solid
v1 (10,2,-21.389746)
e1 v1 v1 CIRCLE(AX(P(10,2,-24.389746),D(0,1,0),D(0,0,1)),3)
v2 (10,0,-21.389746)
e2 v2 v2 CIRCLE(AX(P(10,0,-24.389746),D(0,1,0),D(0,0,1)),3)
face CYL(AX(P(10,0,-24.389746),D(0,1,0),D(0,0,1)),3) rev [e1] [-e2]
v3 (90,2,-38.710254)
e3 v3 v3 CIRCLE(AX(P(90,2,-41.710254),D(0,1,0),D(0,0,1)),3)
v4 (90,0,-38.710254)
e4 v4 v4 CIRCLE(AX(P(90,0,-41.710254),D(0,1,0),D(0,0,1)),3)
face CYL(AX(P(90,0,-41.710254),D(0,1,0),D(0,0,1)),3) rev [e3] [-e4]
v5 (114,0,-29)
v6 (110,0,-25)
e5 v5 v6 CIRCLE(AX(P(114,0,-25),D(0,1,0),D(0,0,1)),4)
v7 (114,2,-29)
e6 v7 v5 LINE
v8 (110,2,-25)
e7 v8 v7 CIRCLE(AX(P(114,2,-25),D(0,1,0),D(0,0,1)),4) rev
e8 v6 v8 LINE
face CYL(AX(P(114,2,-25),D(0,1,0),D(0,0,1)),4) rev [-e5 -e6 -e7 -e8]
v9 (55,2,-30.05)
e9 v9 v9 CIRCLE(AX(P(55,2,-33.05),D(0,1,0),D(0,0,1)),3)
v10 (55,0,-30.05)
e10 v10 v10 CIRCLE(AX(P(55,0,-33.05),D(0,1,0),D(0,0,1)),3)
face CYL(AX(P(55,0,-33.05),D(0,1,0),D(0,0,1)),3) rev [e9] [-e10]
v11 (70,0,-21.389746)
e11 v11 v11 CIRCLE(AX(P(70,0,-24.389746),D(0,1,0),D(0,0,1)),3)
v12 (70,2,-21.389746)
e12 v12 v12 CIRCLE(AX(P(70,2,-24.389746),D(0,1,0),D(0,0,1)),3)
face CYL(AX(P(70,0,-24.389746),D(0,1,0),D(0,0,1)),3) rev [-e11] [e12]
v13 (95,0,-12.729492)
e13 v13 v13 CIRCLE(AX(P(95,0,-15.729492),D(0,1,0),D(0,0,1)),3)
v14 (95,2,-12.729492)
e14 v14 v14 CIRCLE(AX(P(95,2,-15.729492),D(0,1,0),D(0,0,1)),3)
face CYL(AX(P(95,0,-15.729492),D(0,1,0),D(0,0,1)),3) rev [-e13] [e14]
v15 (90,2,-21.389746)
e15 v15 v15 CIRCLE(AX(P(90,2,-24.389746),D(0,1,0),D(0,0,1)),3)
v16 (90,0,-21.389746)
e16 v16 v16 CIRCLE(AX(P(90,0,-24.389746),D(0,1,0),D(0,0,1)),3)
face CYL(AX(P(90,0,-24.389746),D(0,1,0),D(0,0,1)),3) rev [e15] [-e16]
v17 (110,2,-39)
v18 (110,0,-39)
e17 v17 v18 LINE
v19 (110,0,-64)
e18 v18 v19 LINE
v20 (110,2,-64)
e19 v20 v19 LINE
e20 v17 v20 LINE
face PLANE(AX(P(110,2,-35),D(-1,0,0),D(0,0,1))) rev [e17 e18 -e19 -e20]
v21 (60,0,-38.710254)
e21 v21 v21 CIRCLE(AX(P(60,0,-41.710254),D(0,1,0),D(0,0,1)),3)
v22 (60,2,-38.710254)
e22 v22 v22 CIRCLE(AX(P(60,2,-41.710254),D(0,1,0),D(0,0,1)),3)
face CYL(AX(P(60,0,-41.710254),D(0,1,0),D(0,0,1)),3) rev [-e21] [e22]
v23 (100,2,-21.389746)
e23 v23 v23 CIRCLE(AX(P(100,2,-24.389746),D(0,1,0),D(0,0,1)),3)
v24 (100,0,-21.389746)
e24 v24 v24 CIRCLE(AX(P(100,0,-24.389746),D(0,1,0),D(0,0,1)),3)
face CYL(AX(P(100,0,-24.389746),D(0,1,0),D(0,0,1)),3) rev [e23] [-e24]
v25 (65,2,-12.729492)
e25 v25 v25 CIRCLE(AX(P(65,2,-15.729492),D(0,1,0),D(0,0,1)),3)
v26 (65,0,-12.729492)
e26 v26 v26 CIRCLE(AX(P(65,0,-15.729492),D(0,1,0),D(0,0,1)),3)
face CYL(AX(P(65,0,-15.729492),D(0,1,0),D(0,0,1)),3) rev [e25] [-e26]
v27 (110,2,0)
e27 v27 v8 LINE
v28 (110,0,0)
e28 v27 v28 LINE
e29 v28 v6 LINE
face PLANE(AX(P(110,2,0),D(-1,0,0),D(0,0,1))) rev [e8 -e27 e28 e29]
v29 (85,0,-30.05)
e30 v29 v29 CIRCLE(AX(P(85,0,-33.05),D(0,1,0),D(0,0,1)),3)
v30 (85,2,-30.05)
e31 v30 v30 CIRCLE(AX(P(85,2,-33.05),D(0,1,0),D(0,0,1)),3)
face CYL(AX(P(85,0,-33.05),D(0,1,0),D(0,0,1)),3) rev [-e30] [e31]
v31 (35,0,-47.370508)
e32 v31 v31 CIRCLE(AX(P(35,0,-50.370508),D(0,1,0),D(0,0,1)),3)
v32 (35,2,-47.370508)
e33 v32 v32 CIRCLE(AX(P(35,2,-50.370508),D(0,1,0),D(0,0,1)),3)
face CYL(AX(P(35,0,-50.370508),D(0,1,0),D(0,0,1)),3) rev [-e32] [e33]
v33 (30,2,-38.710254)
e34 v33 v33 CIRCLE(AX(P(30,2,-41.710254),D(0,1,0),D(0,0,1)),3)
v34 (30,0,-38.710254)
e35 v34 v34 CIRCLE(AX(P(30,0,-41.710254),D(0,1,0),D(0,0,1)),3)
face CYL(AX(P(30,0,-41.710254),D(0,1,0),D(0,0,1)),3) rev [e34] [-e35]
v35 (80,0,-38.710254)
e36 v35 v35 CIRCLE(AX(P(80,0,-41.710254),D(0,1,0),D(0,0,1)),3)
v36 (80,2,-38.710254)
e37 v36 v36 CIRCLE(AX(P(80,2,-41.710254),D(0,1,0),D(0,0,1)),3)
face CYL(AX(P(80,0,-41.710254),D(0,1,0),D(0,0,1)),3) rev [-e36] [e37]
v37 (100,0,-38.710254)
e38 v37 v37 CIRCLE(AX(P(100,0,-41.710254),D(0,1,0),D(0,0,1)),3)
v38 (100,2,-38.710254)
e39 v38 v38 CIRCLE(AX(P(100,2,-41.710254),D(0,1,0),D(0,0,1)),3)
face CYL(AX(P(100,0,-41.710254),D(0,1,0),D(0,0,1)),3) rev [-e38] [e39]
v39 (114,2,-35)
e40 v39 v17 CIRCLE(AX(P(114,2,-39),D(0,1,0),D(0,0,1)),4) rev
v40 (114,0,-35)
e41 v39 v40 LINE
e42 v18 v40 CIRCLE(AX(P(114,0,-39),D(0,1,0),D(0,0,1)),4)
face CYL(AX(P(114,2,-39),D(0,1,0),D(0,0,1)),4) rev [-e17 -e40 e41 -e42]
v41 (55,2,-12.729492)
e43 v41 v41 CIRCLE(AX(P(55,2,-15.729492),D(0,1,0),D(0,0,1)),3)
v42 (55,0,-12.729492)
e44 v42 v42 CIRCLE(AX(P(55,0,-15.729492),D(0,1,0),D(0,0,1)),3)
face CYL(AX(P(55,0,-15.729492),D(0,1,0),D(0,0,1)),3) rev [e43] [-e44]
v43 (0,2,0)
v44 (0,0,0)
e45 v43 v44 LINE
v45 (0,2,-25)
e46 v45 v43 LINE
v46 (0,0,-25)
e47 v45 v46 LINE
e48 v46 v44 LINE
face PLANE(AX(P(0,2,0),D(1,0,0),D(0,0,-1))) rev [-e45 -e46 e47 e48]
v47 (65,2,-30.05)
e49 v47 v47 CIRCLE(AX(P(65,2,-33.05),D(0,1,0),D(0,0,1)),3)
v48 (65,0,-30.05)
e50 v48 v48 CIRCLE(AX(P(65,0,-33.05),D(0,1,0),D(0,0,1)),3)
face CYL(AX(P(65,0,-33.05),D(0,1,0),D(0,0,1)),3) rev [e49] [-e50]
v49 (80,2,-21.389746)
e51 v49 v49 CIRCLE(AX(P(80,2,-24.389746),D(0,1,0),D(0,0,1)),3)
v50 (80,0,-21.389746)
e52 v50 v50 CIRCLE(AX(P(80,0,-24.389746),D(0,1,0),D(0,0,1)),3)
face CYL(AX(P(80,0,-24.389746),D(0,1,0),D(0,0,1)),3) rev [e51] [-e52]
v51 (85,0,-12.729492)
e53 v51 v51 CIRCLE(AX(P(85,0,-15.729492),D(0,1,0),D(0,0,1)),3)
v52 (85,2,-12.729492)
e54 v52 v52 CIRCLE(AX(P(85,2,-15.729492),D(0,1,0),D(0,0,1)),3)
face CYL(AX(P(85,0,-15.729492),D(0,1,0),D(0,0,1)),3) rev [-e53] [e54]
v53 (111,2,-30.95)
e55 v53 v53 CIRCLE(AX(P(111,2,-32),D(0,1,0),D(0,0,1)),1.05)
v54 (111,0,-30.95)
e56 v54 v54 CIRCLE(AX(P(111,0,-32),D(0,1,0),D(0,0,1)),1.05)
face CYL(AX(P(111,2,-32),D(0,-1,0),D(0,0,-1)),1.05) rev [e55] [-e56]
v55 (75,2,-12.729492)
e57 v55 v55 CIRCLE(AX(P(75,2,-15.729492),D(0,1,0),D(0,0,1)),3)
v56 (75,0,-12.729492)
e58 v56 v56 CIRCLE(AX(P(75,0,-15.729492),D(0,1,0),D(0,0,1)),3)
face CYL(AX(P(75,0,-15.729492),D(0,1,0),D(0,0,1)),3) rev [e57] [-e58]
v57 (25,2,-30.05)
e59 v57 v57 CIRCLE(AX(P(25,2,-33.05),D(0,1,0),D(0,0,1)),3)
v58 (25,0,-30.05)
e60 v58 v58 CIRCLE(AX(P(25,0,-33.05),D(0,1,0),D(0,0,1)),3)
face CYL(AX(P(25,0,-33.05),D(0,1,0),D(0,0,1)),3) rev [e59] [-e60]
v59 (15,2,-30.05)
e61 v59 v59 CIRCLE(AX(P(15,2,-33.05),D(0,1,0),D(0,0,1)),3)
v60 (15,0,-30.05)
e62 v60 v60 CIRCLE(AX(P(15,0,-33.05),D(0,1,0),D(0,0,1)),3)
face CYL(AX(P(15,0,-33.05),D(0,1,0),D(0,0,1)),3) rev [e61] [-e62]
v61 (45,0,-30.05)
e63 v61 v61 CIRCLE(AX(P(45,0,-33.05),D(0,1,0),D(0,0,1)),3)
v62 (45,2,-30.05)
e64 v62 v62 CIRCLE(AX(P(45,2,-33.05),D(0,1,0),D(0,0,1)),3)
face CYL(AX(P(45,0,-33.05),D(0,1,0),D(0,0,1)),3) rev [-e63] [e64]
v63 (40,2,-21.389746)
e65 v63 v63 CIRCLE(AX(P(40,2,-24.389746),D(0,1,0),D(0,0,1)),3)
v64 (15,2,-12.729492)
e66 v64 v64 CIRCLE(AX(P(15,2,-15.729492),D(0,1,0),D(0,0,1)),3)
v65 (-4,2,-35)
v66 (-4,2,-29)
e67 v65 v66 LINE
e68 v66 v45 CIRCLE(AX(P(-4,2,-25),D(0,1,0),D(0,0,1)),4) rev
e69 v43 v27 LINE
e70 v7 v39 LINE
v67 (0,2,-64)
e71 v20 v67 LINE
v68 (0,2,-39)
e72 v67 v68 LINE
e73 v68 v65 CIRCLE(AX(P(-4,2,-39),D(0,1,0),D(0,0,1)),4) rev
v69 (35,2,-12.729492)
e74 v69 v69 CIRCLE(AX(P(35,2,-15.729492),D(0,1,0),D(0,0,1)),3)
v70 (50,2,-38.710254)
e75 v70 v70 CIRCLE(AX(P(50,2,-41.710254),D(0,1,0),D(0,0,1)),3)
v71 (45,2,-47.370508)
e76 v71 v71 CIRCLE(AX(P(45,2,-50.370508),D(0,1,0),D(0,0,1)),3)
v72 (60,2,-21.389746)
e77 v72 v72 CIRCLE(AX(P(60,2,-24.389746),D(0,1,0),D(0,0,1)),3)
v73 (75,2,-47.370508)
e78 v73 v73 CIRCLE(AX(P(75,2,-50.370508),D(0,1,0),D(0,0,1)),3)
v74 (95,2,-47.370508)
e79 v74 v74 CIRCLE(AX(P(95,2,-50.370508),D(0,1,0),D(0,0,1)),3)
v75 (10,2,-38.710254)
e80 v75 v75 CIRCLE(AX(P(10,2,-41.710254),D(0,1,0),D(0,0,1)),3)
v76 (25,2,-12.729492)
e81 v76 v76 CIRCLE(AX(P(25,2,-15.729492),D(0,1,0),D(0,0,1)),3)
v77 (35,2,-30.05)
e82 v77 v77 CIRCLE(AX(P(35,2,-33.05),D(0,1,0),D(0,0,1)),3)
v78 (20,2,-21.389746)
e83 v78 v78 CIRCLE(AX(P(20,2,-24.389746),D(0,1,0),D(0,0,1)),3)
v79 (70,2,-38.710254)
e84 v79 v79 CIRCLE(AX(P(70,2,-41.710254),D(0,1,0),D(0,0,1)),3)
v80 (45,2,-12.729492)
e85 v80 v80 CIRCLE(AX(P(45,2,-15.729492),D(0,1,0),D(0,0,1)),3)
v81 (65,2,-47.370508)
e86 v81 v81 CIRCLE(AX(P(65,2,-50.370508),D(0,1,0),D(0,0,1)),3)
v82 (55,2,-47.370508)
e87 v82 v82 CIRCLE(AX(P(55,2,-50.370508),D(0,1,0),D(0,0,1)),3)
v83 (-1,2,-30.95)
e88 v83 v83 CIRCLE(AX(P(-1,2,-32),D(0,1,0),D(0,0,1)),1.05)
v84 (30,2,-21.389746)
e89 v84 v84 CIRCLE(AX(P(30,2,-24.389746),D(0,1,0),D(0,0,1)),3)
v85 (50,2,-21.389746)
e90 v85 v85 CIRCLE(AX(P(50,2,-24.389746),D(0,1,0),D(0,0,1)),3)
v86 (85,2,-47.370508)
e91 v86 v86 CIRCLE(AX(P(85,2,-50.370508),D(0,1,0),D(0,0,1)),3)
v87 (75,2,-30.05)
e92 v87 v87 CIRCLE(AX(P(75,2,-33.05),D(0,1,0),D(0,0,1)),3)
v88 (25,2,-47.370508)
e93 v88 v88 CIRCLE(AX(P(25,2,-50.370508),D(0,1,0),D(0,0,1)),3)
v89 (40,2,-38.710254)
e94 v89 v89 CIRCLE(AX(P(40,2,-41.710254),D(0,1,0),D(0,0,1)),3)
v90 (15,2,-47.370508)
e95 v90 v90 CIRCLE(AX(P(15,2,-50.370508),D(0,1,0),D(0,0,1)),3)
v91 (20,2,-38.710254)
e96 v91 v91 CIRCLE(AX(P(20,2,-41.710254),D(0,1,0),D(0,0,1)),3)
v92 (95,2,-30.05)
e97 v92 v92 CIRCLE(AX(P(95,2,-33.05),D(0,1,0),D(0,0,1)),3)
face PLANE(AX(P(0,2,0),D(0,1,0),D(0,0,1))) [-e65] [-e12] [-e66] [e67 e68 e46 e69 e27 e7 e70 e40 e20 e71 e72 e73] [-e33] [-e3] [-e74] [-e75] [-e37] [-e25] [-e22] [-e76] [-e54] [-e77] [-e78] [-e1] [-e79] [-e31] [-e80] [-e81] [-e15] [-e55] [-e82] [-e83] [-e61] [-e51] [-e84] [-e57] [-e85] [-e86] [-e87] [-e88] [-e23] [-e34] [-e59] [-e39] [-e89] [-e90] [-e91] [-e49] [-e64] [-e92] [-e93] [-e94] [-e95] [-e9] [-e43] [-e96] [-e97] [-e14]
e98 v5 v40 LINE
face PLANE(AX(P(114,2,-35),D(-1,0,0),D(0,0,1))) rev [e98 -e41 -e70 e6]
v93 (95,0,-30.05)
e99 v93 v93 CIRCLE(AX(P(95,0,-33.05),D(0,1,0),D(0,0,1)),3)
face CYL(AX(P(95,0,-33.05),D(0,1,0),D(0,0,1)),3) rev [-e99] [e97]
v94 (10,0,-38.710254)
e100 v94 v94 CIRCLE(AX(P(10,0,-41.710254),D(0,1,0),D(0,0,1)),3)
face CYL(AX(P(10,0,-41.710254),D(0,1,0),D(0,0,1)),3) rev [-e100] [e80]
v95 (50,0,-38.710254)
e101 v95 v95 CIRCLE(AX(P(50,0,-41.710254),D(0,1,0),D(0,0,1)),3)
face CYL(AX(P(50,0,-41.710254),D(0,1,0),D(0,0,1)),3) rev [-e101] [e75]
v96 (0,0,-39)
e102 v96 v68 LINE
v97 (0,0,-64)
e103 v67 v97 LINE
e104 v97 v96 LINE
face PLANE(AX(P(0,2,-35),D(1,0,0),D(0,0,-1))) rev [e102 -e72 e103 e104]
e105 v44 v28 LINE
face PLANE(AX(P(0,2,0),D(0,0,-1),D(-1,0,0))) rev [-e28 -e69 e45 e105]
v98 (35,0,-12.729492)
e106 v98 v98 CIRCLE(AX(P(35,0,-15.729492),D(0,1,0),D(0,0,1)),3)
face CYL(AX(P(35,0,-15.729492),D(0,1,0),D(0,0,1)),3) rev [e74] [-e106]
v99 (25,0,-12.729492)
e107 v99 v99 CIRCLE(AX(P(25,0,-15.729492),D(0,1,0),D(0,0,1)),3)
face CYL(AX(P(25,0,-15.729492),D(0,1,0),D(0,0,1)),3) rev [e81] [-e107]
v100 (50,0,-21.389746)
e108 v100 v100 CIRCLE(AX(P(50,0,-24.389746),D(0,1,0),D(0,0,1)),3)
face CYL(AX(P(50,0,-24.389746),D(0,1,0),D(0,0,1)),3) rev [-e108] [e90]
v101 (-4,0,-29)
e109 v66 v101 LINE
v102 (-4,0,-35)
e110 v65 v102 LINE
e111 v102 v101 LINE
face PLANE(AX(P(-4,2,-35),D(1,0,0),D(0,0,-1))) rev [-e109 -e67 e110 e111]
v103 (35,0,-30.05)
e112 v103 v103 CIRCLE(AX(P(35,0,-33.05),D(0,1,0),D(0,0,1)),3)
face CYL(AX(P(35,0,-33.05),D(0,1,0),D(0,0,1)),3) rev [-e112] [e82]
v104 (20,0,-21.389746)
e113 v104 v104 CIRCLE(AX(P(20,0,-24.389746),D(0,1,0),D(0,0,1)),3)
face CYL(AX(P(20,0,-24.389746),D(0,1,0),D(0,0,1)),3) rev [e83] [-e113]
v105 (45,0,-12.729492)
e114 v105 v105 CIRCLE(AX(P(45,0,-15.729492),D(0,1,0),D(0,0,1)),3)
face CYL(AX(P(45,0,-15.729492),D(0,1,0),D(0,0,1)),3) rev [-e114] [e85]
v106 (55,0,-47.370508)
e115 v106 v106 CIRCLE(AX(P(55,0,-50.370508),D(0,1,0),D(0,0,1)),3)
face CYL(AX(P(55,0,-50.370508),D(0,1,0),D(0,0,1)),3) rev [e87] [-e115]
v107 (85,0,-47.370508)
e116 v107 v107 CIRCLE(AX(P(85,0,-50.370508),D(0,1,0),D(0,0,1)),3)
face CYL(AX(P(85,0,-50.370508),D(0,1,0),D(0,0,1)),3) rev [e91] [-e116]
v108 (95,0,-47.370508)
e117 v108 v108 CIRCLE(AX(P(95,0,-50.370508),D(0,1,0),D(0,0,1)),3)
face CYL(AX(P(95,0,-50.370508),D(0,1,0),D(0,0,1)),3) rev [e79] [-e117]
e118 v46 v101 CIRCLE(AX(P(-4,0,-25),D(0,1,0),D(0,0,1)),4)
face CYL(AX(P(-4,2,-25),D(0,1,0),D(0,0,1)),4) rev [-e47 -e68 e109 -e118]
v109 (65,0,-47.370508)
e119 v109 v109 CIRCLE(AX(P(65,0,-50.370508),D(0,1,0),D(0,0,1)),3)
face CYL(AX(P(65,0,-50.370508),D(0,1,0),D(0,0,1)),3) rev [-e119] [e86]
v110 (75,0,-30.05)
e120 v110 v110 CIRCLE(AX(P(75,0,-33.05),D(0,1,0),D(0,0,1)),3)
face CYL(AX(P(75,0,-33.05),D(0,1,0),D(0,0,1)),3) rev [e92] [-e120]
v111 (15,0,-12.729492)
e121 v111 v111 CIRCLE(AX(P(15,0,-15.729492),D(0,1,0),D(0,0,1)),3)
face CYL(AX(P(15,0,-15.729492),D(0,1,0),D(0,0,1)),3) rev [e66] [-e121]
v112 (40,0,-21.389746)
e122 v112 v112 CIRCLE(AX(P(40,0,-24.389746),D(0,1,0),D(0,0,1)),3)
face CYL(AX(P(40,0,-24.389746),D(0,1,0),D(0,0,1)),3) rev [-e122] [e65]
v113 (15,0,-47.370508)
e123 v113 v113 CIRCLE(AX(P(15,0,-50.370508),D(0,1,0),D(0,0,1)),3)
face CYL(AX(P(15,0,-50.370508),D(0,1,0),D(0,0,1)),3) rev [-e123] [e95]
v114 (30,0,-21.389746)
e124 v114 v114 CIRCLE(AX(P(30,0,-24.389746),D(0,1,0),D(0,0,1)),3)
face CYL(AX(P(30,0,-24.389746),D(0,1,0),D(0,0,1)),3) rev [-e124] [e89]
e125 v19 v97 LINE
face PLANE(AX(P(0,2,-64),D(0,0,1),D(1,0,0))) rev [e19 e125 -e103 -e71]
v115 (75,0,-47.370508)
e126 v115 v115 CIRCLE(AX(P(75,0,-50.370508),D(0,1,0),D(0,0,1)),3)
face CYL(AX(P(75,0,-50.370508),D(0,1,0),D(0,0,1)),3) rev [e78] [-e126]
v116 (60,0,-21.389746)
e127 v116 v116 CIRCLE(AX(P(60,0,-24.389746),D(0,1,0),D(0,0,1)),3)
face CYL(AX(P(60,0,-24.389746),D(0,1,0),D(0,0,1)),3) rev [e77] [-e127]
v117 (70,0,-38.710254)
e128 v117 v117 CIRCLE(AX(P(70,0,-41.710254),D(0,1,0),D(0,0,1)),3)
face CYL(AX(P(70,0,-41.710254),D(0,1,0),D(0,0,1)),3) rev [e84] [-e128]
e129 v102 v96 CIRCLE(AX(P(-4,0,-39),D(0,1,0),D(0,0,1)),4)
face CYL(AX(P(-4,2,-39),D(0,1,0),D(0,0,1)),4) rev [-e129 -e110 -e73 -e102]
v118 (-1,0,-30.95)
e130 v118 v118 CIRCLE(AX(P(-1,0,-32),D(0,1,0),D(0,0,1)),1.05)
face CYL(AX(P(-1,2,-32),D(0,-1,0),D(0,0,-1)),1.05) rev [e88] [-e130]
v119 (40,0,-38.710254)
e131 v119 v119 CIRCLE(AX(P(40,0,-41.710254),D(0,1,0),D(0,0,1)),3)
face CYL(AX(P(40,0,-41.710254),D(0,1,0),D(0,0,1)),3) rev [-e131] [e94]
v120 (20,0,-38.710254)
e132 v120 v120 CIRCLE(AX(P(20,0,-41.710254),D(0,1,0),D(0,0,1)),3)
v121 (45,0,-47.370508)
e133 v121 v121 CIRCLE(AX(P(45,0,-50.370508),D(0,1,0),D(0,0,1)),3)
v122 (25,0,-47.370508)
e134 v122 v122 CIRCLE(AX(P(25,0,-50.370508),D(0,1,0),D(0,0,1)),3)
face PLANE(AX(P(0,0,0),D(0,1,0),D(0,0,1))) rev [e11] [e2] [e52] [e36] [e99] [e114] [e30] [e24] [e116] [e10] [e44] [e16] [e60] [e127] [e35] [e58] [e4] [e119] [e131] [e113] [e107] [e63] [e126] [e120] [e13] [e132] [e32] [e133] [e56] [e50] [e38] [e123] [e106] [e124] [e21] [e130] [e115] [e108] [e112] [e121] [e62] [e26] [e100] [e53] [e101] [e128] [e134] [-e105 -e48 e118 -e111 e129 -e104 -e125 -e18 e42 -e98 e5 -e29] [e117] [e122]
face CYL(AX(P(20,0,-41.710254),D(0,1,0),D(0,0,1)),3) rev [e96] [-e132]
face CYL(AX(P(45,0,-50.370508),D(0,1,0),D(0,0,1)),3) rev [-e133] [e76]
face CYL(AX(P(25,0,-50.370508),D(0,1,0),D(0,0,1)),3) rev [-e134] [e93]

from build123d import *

# Parameters (mm, degrees)
SKETCH_1_R          = 1.05
EXTRUDE_1_DEPTH     = 2
SKETCH_2_R          = 3
CUT_EXTRUDE_1_DEPTH = 2
OTHER_1_OUTLINE_R   = 3
OTHER_1_DEPTH       = 2
FILLET_1_R          = 4


# Read off the part's stored shape, not the designer's step: 填充阵列1
with BuildPart() as part:
    # 草图1 → 凸台-拉伸1 (new body)
    with BuildSketch(Plane(origin=(0, 0, 0), x_dir=(1, 0, 0), z_dir=(0, 1, 0))):
        Polygon((110, 35), (110, 64), (0, 64), (0, 35), (-4, 35), (-4, 29), (0, 29), (0, 0), (110, 0), (110, 29), (114, 29), (114, 35), align=None)
        with Locations(Location((-1, 32, 0), (0, 0, 270))):
            Circle(SKETCH_1_R, mode=Mode.SUBTRACT)
        with Locations(Location((111, 32, 0), (0, 0, 270))):
            Circle(SKETCH_1_R, mode=Mode.SUBTRACT)
    extrude(amount=EXTRUDE_1_DEPTH)

    # 草图2 → 切除-拉伸1 (cut)
    with BuildSketch(Plane(origin=(0, 2, 0), x_dir=(1, 0, 0), z_dir=(0, 1, 0))):
        with Locations(Location((55, 33.05, 0), (0, 0, 270))):
            Circle(SKETCH_2_R)
    extrude(amount=-CUT_EXTRUDE_1_DEPTH, mode=Mode.SUBTRACT)

    # 填充阵列1 outline → 填充阵列1 (cut)
    with BuildSketch(Plane(origin=(0, 0, 0), x_dir=(1, 0, 0), z_dir=(0, 1, 0))):
        with Locations((10, 41.710254038)):
            Circle(OTHER_1_OUTLINE_R)
        with Locations((85, 33.05)):
            Circle(OTHER_1_OUTLINE_R)
        with Locations((90, 41.710254038)):
            Circle(OTHER_1_OUTLINE_R)
        with Locations((95, 50.370508076)):
            Circle(OTHER_1_OUTLINE_R)
        with Locations((85, 15.729491924)):
            Circle(OTHER_1_OUTLINE_R)
        with Locations((80, 24.389745962)):
            Circle(OTHER_1_OUTLINE_R)
        with Locations((75, 15.729491924)):
            Circle(OTHER_1_OUTLINE_R)
        with Locations((85, 50.370508076)):
            Circle(OTHER_1_OUTLINE_R)
        with Locations((80, 41.710254038)):
            Circle(OTHER_1_OUTLINE_R)
        with Locations((100, 24.389745962)):
            Circle(OTHER_1_OUTLINE_R)
        with Locations((90, 24.389745962)):
            Circle(OTHER_1_OUTLINE_R)
        with Locations((95, 33.05)):
            Circle(OTHER_1_OUTLINE_R)
        with Locations((100, 41.710254038)):
            Circle(OTHER_1_OUTLINE_R)
        with Locations((95, 15.729491924)):
            Circle(OTHER_1_OUTLINE_R)
        with Locations((30, 41.710254038)):
            Circle(OTHER_1_OUTLINE_R)
        with Locations((35, 50.370508076)):
            Circle(OTHER_1_OUTLINE_R)
        with Locations((25, 15.729491924)):
            Circle(OTHER_1_OUTLINE_R)
        with Locations((30, 24.389745962)):
            Circle(OTHER_1_OUTLINE_R)
        with Locations((35, 15.729491924)):
            Circle(OTHER_1_OUTLINE_R)
        with Locations((45, 50.370508076)):
            Circle(OTHER_1_OUTLINE_R)
        with Locations((40, 41.710254038)):
            Circle(OTHER_1_OUTLINE_R)
        with Locations((35, 33.05)):
            Circle(OTHER_1_OUTLINE_R)
        with Locations((20, 41.710254038)):
            Circle(OTHER_1_OUTLINE_R)
        with Locations((15, 33.05)):
            Circle(OTHER_1_OUTLINE_R)
        with Locations((10, 24.389745962)):
            Circle(OTHER_1_OUTLINE_R)
        with Locations((15, 50.370508076)):
            Circle(OTHER_1_OUTLINE_R)
        with Locations((25, 33.05)):
            Circle(OTHER_1_OUTLINE_R)
        with Locations((20, 24.389745962)):
            Circle(OTHER_1_OUTLINE_R)
        with Locations((15, 15.729491924)):
            Circle(OTHER_1_OUTLINE_R)
        with Locations((25, 50.370508076)):
            Circle(OTHER_1_OUTLINE_R)
        with Locations((55, 15.729491924)):
            Circle(OTHER_1_OUTLINE_R)
        with Locations((60, 24.389745962)):
            Circle(OTHER_1_OUTLINE_R)
        with Locations((65, 33.05)):
            Circle(OTHER_1_OUTLINE_R)
        with Locations((70, 41.710254038)):
            Circle(OTHER_1_OUTLINE_R)
        with Locations((75, 33.05)):
            Circle(OTHER_1_OUTLINE_R)
        with Locations((70, 24.389745962)):
            Circle(OTHER_1_OUTLINE_R)
        with Locations((65, 15.729491924)):
            Circle(OTHER_1_OUTLINE_R)
        with Locations((75, 50.370508076)):
            Circle(OTHER_1_OUTLINE_R)
        with Locations((40, 24.389745962)):
            Circle(OTHER_1_OUTLINE_R)
        with Locations((45, 33.05)):
            Circle(OTHER_1_OUTLINE_R)
        with Locations((50, 41.710254038)):
            Circle(OTHER_1_OUTLINE_R)
        with Locations((55, 50.370508076)):
            Circle(OTHER_1_OUTLINE_R)
        with Locations((45, 15.729491924)):
            Circle(OTHER_1_OUTLINE_R)
        with Locations((50, 24.389745962)):
            Circle(OTHER_1_OUTLINE_R)
        with Locations((60, 41.710254038)):
            Circle(OTHER_1_OUTLINE_R)
        with Locations((65, 50.370508076)):
            Circle(OTHER_1_OUTLINE_R)
    extrude(amount=OTHER_1_DEPTH, mode=Mode.SUBTRACT)

    # 圆角1
    fillet_1_edges = [part.edges().sort_by_distance(p)[0] for p in [
        (110, 1, -29),
        (110, 1, -35),
        (0, 1, -35),
        (0, 1, -29),
    ]]
    fillet(fillet_1_edges, radius=FILLET_1_R - 0.0001)  # a hair under: the kernel refuses the full size


solid = part.part
